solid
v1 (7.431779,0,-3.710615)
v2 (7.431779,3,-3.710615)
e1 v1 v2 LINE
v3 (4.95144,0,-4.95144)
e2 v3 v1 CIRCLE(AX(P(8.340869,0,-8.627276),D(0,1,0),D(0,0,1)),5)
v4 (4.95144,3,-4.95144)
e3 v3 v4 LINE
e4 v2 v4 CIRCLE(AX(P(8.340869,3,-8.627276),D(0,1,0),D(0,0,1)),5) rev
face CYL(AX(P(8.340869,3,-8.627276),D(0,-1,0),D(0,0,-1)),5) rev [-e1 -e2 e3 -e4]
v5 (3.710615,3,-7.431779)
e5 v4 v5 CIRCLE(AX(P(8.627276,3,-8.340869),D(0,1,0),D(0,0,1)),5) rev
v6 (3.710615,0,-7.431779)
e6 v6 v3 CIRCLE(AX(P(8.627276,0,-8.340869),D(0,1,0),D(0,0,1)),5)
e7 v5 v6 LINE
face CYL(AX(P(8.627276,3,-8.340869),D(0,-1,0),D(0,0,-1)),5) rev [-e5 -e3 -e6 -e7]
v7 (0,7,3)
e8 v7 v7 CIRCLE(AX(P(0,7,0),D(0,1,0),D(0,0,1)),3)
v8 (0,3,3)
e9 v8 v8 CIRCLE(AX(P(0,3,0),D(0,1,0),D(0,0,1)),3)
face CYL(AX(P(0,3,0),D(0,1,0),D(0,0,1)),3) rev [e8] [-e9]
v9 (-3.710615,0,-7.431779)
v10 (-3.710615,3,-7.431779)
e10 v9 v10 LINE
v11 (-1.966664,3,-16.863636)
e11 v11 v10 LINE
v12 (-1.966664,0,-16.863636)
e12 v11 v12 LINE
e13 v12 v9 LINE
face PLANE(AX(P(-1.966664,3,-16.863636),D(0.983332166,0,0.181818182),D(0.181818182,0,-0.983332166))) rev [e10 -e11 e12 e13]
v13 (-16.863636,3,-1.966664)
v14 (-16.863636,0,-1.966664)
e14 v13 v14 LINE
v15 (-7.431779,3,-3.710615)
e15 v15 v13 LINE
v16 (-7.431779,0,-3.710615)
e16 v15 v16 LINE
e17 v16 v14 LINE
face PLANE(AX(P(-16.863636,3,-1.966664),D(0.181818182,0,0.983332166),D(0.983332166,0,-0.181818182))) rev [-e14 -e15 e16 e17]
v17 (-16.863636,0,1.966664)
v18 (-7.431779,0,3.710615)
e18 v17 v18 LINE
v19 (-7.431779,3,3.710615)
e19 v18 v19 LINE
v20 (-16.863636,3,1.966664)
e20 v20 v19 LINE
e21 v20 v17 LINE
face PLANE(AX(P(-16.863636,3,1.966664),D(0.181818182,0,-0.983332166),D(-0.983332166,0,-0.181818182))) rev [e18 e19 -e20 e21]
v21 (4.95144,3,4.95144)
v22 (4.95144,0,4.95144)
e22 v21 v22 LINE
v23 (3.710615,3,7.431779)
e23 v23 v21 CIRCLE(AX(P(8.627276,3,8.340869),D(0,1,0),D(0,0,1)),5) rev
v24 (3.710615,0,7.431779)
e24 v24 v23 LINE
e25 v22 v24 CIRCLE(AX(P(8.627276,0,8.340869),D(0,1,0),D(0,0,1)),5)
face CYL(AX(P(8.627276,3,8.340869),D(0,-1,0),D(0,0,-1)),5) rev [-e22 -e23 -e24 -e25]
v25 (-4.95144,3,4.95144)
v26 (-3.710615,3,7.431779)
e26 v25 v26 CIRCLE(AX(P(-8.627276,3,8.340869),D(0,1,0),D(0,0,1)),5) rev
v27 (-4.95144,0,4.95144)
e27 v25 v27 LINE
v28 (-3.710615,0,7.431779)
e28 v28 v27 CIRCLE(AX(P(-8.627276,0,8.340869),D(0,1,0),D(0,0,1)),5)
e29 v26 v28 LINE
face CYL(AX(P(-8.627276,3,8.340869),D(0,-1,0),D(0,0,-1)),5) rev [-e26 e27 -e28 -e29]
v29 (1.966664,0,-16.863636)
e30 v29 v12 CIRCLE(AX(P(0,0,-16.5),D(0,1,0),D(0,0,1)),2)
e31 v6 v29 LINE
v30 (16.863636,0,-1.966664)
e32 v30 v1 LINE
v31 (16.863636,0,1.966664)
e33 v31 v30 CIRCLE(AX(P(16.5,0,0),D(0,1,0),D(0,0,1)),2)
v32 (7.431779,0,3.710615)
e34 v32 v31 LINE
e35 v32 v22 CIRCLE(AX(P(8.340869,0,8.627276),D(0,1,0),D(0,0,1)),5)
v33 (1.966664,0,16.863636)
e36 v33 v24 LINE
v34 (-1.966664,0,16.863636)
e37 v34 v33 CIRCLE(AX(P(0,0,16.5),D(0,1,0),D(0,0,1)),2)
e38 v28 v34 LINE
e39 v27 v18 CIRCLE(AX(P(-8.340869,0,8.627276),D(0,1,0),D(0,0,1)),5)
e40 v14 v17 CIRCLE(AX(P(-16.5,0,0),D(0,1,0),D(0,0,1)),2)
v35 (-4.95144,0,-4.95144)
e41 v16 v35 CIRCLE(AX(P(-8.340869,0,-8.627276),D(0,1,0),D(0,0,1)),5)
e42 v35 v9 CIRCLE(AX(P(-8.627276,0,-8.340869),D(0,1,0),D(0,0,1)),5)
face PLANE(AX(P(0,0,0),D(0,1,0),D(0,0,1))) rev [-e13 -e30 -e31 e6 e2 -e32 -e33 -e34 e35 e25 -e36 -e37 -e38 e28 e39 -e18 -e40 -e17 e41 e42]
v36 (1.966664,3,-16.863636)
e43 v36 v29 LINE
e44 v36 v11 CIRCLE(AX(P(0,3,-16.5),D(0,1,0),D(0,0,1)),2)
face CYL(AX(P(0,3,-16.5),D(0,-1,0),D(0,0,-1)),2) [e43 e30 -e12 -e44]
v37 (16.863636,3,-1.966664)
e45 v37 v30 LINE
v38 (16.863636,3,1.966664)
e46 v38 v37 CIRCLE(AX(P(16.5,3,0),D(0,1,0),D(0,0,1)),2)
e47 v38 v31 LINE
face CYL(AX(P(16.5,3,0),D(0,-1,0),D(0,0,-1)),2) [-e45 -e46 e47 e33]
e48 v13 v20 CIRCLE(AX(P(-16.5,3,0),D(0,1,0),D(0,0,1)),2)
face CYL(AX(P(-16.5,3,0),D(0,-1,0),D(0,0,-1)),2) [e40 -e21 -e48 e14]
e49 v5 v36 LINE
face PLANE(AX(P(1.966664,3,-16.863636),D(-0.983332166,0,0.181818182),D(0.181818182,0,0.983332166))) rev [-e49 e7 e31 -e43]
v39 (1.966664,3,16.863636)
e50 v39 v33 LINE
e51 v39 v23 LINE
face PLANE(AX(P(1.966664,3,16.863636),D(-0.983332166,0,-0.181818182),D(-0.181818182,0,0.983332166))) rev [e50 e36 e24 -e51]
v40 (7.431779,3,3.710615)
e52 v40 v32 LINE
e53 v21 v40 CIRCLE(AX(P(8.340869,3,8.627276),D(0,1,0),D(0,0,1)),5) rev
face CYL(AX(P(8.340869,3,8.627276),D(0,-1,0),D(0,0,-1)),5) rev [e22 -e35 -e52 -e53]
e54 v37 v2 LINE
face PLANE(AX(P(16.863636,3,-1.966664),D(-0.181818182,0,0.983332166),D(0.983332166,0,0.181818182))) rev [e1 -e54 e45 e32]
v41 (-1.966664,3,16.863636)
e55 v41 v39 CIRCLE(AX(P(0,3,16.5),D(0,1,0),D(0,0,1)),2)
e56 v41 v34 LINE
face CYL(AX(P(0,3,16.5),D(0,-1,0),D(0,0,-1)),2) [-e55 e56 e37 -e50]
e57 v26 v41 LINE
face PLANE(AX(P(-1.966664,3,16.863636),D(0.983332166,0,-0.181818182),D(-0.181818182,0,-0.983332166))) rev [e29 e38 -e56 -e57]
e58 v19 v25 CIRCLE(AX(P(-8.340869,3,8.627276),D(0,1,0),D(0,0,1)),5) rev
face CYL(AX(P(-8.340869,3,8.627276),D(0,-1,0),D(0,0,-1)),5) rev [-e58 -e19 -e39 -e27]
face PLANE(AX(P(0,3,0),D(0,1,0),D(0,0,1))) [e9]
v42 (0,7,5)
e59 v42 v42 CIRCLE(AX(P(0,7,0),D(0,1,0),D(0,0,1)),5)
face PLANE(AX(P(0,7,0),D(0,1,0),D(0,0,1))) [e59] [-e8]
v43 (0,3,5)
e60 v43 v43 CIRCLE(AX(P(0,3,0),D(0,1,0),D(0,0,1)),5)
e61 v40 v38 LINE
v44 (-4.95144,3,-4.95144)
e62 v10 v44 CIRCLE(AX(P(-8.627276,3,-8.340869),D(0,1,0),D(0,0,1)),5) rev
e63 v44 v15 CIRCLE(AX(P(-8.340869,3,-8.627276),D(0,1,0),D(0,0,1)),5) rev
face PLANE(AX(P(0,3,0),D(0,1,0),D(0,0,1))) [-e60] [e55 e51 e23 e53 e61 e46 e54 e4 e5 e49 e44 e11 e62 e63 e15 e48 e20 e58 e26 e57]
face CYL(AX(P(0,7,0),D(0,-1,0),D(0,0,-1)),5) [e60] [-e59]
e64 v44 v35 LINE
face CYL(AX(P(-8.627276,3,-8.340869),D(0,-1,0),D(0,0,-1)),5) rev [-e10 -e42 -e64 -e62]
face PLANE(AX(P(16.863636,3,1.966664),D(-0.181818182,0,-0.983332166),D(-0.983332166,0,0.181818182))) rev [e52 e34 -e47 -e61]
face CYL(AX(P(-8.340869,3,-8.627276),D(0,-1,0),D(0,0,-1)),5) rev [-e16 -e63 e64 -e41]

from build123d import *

# Parameters (mm, degrees)
BOSS_EXTRUDE1_DEPTH = 3
SKETCH2_R           = 5
BOSS_EXTRUDE2_DEPTH = 4
SKETCH3_R           = 3
CUT_EXTRUDE1_DEPTH  = 4
FILLET1_R           = 5


with BuildPart() as part:
    # Sketch1 → Boss-Extrude1 (new body)
    with BuildSketch(Plane(origin=(0, 0, 0), x_dir=(1, 0, 0), z_dir=(0, 1, 0))):
        with BuildLine():
            Line((-1.966664332, 16.863636364), (-4.025937287, 5.726415018))
            ThreePointArc((-4.025937287, 5.726415018), (-4.949747468, 4.949747468), (-5.726415018, 4.025937287))
            Line((-5.726415018, 4.025937287), (-16.863636364, 1.966664332))
            ThreePointArc((-16.863636364, 1.966664332), (-18.5, 0), (-16.863636364, -1.966664332))
            Line((-16.863636364, -1.966664332), (-5.726415018, -4.025937287))
            ThreePointArc((-5.726415018, -4.025937287), (-4.949747468, -4.949747468), (-4.025937287, -5.726415018))
            Line((-4.025937287, -5.726415018), (-1.966664332, -16.863636364))
            ThreePointArc((-1.966664332, -16.863636364), (0, -18.5), (1.966664332, -16.863636364))
            Line((1.966664332, -16.863636364), (4.025937287, -5.726415018))
            ThreePointArc((4.025937287, -5.726415018), (4.949747468, -4.949747468), (5.726415018, -4.025937287))
            Line((5.726415018, -4.025937287), (16.863636364, -1.966664332))
            ThreePointArc((16.863636364, -1.966664332), (18.5, 0), (16.863636364, 1.966664332))
            Line((16.863636364, 1.966664332), (5.726415018, 4.025937287))
            ThreePointArc((5.726415018, 4.025937287), (4.949747468, 4.949747468), (4.025937287, 5.726415018))
            Line((4.025937287, 5.726415018), (1.966664332, 16.863636364))
            ThreePointArc((1.966664332, 16.863636364), (0, 18.5), (-1.966664332, 16.863636364))
        make_face()
    extrude(amount=BOSS_EXTRUDE1_DEPTH)

    # Sketch2 → Boss-Extrude2 (add)
    with BuildSketch(Plane(origin=(0, 3, 0), x_dir=(1, 0, 0), z_dir=(0, 1, 0))):
        with Locations(Location((0, 0, 0), (0, 0, 270))):
            Circle(SKETCH2_R)
    extrude(amount=BOSS_EXTRUDE2_DEPTH)

    # Sketch3 → Cut-Extrude1 (cut)
    with BuildSketch(Plane(origin=(0, 7, 0), x_dir=(1, 0, 0), z_dir=(0, 1, 0))):
        with Locations(Location((0, 0, 0), (0, 0, 270))):
            Circle(SKETCH3_R)
    extrude(amount=-CUT_EXTRUDE1_DEPTH, mode=Mode.SUBTRACT)

    # Fillet1
    # the kernel refuses this fillet: 5 mm, written as the material it adds along each edge
    with BuildSketch(Plane(origin=(5.726415018, 0, 4.025937287), x_dir=(0.983332166035634, 0, -0.18181818181817894), z_dir=(0, 1, 0))) as fillet1_piece_1:
        with BuildLine():
            CenterArc((1.734270095, -5), FILLET1_R, 90, 33.557309762)
            ThreePointArc((-1.029583897, -0.833333333), (-0.495036767, -0.441074207), (0, 0))
            Line((0, 0), (1.734270095, 0))
        make_face()
    extrude(amount=3)
    with BuildSketch(Plane(origin=(4.025937287, 0, 5.726415018), x_dir=(0.7599749646341246, 0, -0.6499523468142576), z_dir=(0, 1, 0))) as fillet1_piece_2:
        with BuildLine():
            CenterArc((1.797631616, -4.977571028), FILLET1_R, 95.428999418, 33.557309762)
            Line((-1.348041755, -1.091089451), (0, 0))
            ThreePointArc((0, 0), (0.662285332, -0.031400561), (1.324570664, 0))
        make_face()
    extrude(amount=3)
    with BuildSketch(Plane(origin=(-4.025937287, 0, 5.726415018), x_dir=(-0.7599749646342022, 0, -0.6499523468141668), z_dir=(0, 1, 0)), Plane(origin=(-5.726415018, 0, -4.025937287), x_dir=(0.6499523468141845, 0, -0.7599749646341871), z_dir=(0, 1, 0)), Plane(origin=(4.025937287, 0, -5.726415018), x_dir=(0.7599749646341224, 0, 0.6499523468142602), z_dir=(0, 1, 0))) as fillet1_piece_3:
        with BuildLine():
            CenterArc((1.797631616, 4.977571028), FILLET1_R, 231.01369082, 33.557309762)
            Line((-1.348041755, 1.091089451), (0, 0))
            ThreePointArc((0, 0), (0.662285332, 0.031400561), (1.324570664, 0))
        make_face()
    extrude(amount=3)
    with BuildSketch(Plane(origin=(-5.726415018, 0, 4.025937287), x_dir=(-0.9833321660356334, 0, -0.18181818181818182), z_dir=(0, 1, 0)), Plane(origin=(-4.025937287, 0, -5.726415018), x_dir=(0.1818181818181817, 0, -0.9833321660356334), z_dir=(0, 1, 0)), Plane(origin=(5.726415018, 0, -4.025937287), x_dir=(0.9833321660356329, 0, 0.1818181818181846), z_dir=(0, 1, 0))) as fillet1_piece_4:
        with BuildLine():
            CenterArc((1.734270095, 5), FILLET1_R, 236.442690238, 33.557309762)
            ThreePointArc((-1.029583897, 0.833333333), (-0.495036767, 0.441074207), (0, 0))
            Line((0, 0), (1.734270095, 0))
        make_face()
    extrude(amount=3)


solid = part.part
